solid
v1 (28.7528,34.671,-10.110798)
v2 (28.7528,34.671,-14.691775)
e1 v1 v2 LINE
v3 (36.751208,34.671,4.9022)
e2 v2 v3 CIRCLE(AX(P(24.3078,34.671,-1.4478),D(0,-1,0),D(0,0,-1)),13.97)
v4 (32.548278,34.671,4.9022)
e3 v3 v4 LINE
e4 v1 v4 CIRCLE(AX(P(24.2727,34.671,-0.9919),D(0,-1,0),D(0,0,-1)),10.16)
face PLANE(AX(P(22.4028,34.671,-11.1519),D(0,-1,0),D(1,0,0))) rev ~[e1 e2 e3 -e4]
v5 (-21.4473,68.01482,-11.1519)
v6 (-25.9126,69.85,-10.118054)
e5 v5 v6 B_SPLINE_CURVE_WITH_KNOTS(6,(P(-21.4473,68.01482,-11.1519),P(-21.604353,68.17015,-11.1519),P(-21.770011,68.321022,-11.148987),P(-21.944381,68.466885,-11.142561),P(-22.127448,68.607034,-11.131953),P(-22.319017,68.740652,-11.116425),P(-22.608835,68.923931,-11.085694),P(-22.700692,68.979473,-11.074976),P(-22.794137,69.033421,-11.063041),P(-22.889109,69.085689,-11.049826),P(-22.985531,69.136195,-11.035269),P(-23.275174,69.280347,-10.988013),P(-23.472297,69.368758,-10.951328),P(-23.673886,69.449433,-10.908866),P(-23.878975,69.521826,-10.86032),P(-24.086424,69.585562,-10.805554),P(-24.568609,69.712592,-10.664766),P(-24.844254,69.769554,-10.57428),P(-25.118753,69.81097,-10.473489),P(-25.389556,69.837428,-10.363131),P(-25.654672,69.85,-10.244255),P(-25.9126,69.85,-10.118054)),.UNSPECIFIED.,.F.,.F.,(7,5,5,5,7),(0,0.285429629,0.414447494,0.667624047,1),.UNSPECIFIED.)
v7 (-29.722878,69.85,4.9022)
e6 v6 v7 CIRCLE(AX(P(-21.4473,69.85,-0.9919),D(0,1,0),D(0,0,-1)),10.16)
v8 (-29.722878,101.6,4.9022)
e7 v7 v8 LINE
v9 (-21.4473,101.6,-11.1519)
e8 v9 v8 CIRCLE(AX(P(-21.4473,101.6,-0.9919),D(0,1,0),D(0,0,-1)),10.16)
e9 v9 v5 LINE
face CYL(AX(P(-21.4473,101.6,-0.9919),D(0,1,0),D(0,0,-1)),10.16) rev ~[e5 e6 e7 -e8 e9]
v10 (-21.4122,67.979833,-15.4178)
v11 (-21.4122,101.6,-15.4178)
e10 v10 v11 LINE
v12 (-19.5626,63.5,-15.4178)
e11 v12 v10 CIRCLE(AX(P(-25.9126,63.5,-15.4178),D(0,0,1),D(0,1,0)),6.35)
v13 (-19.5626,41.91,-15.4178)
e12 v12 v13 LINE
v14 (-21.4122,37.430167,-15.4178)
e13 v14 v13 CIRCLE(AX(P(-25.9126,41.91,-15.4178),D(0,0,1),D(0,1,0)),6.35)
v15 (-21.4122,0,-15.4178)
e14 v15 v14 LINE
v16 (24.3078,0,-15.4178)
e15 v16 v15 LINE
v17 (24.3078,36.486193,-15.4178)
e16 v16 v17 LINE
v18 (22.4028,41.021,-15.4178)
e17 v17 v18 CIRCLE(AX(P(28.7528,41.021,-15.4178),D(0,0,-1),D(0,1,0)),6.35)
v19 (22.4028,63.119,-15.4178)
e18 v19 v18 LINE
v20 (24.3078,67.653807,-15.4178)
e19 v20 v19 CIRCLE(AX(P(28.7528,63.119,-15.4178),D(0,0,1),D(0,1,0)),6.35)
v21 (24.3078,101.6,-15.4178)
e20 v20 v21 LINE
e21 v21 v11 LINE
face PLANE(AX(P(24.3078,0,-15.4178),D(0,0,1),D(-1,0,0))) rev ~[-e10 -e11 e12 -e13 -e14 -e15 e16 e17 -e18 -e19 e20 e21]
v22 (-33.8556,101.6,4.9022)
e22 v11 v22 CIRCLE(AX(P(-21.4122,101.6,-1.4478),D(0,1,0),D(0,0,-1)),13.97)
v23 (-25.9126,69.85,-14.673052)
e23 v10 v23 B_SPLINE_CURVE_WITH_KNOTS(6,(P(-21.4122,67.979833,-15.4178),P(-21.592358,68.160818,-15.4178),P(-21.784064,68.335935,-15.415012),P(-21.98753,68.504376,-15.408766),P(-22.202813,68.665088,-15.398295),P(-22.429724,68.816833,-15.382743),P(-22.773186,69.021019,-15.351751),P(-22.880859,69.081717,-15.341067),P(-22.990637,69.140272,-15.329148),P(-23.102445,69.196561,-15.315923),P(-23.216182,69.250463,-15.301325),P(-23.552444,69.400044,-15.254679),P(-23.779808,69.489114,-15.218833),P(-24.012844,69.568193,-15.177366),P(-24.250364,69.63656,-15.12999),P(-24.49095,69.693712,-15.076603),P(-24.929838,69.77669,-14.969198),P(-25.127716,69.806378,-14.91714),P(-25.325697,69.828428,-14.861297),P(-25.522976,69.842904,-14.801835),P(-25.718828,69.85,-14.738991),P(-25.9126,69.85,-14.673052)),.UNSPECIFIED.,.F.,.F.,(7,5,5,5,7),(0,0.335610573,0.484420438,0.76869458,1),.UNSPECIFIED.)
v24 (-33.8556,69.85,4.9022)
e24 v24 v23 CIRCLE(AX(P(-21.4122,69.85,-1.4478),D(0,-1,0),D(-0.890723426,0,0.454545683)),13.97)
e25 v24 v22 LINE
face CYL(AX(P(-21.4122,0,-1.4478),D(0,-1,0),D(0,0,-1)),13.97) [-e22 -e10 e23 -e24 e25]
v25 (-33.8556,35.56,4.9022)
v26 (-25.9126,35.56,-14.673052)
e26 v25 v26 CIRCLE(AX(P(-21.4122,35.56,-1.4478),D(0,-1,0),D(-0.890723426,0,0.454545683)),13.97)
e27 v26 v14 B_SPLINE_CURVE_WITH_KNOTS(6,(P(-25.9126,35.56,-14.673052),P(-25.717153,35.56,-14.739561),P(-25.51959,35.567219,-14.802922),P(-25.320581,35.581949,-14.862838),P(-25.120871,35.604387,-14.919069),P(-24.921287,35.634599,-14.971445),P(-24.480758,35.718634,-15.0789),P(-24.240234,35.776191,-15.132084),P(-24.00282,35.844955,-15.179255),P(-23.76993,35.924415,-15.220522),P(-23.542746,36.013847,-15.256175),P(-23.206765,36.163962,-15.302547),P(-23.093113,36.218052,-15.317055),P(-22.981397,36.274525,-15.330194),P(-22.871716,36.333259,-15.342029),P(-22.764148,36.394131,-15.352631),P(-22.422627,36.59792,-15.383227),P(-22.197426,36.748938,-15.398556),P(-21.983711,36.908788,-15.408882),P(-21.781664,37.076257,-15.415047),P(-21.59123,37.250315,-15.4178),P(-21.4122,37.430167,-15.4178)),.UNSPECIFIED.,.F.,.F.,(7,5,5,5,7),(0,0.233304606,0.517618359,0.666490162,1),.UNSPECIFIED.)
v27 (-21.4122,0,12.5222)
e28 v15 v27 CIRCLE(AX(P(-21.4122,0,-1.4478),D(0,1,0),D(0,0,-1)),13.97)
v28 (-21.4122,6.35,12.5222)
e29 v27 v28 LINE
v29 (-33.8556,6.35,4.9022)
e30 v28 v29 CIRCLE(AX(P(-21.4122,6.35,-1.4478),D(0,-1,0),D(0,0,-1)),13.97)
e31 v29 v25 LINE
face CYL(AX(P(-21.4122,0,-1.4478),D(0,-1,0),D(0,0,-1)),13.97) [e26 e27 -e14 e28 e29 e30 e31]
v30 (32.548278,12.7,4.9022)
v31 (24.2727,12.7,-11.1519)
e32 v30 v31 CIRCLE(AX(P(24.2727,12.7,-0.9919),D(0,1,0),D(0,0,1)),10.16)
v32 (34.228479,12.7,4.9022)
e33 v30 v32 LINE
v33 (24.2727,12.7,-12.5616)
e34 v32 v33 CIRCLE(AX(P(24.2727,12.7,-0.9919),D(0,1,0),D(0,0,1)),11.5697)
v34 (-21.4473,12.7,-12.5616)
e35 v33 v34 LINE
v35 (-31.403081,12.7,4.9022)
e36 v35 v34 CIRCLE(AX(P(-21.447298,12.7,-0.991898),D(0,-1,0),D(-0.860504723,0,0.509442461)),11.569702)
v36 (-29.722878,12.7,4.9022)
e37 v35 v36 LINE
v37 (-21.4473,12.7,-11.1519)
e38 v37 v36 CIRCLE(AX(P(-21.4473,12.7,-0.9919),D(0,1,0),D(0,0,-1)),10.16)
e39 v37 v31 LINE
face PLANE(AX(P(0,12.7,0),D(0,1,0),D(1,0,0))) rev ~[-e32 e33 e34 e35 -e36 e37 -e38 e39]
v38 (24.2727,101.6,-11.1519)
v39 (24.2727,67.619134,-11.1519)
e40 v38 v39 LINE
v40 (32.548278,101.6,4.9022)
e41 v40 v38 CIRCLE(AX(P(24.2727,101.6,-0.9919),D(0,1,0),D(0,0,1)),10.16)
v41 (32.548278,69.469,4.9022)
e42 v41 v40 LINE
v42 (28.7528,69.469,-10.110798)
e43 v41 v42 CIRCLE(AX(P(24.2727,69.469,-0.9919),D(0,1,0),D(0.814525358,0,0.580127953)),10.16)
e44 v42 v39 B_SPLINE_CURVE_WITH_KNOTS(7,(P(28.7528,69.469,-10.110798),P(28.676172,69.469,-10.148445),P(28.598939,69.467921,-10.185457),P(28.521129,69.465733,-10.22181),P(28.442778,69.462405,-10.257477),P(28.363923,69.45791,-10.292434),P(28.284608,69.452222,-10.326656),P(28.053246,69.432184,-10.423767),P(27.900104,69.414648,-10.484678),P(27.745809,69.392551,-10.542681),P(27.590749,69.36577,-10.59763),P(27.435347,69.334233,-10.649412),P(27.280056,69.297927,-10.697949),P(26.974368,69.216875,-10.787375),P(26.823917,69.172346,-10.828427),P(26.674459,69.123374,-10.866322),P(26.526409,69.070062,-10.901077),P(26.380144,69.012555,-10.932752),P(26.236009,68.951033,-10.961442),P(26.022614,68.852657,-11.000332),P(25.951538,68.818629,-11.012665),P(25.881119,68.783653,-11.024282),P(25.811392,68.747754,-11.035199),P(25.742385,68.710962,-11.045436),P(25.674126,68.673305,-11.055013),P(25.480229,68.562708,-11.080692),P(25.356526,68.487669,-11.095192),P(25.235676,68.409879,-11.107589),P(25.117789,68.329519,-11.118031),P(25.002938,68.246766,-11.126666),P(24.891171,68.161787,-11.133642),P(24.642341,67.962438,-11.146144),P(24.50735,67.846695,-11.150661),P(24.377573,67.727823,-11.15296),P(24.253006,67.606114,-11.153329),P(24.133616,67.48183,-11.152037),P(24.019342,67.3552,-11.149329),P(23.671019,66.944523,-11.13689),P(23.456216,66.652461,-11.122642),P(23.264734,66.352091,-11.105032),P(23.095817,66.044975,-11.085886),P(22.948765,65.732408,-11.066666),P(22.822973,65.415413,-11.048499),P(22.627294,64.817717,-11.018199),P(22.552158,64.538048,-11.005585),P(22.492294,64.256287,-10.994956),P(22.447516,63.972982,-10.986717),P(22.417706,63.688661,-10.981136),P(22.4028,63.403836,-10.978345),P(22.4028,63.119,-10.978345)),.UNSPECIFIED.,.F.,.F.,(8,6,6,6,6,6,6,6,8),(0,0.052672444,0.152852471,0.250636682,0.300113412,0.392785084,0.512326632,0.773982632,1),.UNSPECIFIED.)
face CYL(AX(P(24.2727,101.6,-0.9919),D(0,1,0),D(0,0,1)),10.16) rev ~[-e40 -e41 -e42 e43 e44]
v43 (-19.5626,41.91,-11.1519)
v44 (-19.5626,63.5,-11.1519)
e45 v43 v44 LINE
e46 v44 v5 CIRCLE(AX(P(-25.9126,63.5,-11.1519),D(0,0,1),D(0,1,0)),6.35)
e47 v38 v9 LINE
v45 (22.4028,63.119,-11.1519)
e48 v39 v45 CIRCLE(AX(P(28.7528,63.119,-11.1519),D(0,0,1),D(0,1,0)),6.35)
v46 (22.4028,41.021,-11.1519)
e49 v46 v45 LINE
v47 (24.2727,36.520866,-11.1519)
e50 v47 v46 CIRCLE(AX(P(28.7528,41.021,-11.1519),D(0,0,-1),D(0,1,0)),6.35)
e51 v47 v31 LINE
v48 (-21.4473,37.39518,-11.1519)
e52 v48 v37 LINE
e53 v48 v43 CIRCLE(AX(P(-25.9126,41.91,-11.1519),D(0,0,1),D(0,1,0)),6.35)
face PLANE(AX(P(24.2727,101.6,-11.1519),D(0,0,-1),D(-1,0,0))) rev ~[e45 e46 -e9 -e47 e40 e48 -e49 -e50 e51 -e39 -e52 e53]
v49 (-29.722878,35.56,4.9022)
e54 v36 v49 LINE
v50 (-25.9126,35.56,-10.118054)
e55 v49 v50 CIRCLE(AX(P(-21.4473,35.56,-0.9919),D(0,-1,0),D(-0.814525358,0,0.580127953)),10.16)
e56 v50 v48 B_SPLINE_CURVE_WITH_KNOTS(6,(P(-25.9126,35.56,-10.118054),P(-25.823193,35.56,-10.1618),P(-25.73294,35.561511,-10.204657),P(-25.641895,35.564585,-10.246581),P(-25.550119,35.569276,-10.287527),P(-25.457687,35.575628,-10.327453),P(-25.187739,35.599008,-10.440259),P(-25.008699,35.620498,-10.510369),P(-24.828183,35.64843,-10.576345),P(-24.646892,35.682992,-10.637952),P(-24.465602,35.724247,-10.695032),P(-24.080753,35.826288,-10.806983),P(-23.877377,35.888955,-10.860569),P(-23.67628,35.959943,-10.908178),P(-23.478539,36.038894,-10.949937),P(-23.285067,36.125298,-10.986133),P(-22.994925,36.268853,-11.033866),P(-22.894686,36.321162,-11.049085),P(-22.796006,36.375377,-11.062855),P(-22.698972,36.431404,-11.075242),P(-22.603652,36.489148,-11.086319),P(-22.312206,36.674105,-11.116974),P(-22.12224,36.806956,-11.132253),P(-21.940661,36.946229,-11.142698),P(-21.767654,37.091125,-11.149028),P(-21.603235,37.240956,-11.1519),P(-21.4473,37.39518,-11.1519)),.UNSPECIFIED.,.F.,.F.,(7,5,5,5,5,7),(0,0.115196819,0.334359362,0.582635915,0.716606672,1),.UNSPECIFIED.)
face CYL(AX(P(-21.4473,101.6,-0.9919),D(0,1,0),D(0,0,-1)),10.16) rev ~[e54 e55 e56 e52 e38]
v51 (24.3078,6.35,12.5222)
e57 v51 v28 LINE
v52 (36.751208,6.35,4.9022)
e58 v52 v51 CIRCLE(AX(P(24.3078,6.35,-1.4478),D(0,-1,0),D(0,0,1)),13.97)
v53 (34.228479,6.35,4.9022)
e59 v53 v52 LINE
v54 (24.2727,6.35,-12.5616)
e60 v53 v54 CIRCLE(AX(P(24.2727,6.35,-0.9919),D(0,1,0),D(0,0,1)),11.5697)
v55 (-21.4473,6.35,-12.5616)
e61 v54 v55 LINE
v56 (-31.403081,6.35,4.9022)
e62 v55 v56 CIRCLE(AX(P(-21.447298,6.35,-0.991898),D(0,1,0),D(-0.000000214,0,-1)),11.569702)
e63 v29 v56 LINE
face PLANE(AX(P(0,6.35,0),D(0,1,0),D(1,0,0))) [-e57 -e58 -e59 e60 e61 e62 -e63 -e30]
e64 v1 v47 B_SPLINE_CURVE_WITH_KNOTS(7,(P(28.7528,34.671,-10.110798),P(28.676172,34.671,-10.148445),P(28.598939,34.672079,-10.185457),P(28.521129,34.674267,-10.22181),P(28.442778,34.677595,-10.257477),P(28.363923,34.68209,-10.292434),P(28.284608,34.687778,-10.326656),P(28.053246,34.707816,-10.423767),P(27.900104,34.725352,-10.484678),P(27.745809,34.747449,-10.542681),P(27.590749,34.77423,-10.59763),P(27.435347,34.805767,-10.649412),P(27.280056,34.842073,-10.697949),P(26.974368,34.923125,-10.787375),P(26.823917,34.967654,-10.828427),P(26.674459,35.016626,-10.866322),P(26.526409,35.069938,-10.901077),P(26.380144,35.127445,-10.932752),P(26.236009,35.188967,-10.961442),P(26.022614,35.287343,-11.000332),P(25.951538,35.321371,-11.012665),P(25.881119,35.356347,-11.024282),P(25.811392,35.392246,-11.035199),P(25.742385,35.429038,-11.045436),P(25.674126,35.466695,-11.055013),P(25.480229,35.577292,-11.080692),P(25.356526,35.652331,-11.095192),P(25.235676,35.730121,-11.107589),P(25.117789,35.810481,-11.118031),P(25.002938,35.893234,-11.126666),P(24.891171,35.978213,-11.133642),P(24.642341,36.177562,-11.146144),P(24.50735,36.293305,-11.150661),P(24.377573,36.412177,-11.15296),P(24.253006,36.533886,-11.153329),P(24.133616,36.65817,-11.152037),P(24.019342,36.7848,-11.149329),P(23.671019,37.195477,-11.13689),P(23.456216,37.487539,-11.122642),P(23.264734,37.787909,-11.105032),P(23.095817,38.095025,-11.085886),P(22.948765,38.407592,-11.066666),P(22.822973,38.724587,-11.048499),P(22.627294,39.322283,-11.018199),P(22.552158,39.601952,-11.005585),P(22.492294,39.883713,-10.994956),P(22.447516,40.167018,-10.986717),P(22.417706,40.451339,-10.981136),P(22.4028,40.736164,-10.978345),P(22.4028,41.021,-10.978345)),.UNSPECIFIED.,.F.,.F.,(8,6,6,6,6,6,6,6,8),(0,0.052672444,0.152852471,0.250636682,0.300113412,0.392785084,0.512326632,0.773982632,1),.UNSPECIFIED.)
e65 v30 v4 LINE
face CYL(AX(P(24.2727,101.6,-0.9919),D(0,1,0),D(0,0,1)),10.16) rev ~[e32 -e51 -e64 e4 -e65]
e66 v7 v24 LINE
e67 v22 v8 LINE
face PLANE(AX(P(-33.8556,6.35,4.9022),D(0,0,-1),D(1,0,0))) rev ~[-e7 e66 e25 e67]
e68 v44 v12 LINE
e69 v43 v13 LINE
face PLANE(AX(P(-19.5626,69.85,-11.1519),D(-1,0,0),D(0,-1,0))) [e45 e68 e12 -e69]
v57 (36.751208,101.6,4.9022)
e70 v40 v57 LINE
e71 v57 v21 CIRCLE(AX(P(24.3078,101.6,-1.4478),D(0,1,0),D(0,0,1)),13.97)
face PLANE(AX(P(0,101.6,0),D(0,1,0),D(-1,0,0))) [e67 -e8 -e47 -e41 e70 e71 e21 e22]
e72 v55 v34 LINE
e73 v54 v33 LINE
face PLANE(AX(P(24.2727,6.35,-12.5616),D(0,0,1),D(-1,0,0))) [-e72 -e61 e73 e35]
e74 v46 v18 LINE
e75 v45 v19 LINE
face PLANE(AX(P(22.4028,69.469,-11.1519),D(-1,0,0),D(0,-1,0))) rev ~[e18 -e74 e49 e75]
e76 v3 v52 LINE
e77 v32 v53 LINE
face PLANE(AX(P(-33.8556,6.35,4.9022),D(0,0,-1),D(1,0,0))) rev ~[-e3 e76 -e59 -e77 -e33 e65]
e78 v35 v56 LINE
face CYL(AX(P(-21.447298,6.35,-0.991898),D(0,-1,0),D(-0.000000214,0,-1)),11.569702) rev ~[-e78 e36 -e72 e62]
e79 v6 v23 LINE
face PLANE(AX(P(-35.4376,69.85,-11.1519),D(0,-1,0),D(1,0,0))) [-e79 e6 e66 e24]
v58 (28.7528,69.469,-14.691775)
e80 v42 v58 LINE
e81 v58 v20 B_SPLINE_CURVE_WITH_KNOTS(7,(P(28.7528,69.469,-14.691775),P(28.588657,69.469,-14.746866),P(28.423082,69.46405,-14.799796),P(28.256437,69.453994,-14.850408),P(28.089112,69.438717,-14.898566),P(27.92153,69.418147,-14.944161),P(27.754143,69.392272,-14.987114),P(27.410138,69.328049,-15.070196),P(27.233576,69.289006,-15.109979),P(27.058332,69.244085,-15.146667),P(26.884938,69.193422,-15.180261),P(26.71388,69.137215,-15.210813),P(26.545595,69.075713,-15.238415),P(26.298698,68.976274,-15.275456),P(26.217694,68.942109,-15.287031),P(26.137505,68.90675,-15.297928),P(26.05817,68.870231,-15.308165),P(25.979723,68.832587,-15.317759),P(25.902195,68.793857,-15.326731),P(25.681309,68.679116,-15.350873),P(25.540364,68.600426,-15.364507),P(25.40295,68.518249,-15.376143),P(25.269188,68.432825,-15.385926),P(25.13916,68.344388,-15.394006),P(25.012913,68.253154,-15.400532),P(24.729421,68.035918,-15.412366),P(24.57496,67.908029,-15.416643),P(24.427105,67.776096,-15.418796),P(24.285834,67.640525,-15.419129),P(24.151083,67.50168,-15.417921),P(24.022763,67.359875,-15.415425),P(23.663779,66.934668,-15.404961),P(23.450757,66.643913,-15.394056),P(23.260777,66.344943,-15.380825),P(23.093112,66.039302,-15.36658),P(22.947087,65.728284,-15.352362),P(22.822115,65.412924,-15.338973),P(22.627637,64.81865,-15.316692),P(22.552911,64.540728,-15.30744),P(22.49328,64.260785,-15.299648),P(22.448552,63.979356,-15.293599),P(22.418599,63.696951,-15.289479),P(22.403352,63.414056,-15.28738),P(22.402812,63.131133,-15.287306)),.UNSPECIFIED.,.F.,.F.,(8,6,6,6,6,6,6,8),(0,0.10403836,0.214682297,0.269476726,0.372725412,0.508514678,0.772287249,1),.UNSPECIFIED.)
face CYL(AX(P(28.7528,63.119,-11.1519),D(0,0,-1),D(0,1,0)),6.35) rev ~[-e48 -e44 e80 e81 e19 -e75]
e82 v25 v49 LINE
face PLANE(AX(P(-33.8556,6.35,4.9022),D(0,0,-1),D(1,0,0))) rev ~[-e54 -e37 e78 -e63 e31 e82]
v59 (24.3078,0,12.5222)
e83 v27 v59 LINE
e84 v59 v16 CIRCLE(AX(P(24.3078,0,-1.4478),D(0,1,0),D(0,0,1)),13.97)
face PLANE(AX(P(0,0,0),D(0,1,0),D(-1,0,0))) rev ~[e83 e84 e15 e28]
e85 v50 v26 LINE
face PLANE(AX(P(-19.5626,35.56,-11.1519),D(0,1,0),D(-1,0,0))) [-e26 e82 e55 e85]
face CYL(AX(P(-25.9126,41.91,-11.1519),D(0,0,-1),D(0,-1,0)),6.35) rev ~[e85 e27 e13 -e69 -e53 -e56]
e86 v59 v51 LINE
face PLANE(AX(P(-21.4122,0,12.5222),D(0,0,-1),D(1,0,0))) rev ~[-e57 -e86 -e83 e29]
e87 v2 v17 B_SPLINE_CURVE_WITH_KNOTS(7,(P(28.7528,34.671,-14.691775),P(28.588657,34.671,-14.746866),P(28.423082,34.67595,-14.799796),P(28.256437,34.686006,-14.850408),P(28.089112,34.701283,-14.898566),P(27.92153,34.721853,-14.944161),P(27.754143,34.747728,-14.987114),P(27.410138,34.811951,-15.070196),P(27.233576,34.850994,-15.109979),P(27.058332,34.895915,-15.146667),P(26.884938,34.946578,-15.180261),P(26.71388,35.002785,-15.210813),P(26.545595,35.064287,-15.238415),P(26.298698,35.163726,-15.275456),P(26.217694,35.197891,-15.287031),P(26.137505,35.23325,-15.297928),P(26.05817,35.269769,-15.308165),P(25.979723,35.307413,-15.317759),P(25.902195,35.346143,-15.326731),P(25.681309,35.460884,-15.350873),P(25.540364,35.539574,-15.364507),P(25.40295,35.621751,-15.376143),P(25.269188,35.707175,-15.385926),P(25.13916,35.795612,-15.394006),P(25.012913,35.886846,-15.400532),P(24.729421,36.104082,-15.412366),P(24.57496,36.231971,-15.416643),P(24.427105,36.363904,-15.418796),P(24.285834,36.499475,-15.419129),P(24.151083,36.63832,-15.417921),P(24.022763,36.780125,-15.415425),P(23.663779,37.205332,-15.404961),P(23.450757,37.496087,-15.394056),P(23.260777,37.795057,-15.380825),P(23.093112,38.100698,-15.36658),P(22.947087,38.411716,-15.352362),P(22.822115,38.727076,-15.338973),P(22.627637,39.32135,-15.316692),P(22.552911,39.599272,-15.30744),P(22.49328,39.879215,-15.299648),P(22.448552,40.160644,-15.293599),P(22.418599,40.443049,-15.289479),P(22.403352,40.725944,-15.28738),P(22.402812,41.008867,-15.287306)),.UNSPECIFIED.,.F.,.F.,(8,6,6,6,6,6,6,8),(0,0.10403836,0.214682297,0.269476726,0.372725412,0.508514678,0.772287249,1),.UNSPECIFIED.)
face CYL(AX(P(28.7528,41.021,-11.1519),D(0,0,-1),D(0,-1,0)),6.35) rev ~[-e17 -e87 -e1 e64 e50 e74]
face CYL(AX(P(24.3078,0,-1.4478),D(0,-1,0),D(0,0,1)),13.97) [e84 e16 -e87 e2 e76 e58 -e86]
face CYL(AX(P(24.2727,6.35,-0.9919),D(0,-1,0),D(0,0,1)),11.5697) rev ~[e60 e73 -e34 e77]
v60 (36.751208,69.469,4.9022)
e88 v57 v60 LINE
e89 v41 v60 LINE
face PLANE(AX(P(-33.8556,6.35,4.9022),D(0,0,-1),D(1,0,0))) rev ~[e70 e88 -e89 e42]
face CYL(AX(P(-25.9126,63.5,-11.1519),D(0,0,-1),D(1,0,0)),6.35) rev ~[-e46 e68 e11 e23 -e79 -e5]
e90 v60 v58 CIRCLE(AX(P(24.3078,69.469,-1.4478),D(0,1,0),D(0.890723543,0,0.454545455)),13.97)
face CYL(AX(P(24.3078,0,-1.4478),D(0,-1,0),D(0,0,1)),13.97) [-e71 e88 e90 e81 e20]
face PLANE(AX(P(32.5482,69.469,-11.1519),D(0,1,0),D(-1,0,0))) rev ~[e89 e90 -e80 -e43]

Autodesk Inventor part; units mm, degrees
ref_plane "YZ Plane" through (0, 0, 0) normal (1, 0, 0) x (0, 1, 0)
sketch "Sketch1" plane through (0, 0, 0) normal (0, 1, 0) x (-1, 0, 0)
  line L0 (-24.3078, -15.4178) -> (21.4122, -15.4178)
  line L1 (21.4122, 12.5222) -> (-24.3078, 12.5222)
  arc A0 (21.4122, -15.4178) -> (21.4122, 12.5222) centre (21.4122, -1.4478) ccw
  arc A1 (-24.3078, 12.5222) -> (-24.3078, -15.4178) centre (-24.3078, -1.4478) ccw
  point P0 (0, 0)
  dimension "d2" = 27.94
  dimension "d3" = 45.72
extrude "Extrusion1" add sketch "Sketch1" along normal blind 101.6
sketch "Sketch2" plane through (0, 101.6, 0) normal (0, 1, 0) x (1, 0, 0)
  line L0 (24.2727, 11.1519) -> (-21.4473, 11.1519)
  line L1 (-21.4473, -9.1681) -> (24.2727, -9.1681)
  arc A0 (-21.4473, 11.1519) -> (-21.4473, -9.1681) centre (-21.4473, 0.9919) ccw
  arc A1 (24.2727, -9.1681) -> (24.2727, 11.1519) centre (24.2727, 0.9919) ccw
  arc A2 (-21.4122, 15.4178) -> (-21.4122, -12.5222) centre (-21.4122, 1.4478) ccw projected
  point P0 (0, 0)
  dimension "d7" = 20.32
  dimension "d8" = 45.72
extrude "Extrusion2" cut sketch "Sketch2" against normal blind 95.25
sketch "Sketch3" plane through (0, 6.35, 0) normal (0, 1, 0) x (1, 0, 0)
  arc A0 (-21.4122, 15.4178) -> (-21.4122, -12.5222) centre (-21.4122, 1.4478) ccw projected
  line L0 (-33.8556, -4.9022) -> (40.6958, -4.9022)
  line L1 (40.6958, -4.9022) -> (40.6958, -12.5222)
  line L2 (40.6958, -12.5222) -> (-33.8556, -12.5222)
  line L3 (-33.8556, -12.5222) -> (-33.8556, -4.9022)
  line L4 (-21.4122, -12.5222) -> (24.3078, -12.5222) projected
  point P0 (0, 0)
  dimension "d13" = 7.62
  dimension "d14" = 0
extrude "Extrusion3" cut sketch "Sketch3" along normal blind 95.25
fillet "Fillet1" [suppressed]
ref_plane "Work Plane1" through (-21.4473, 101.6, -11.1519) normal (-1, 0, 0) x (0, -1, 0)
ref_plane "Work Plane2" through (24.2727, 101.6, -11.1519) normal (-1, 0, 0) x (0, -1, 0)
sketch "Sketch6" plane through (24.2727, 101.6, -11.1519) normal (-1, 0, 0) x (0, -1, 0)
  line L0 (66.929, 0.4433) -> (32.131, 0.4433)
  line L1 (32.131, 0.4433) -> (32.131, 26.3545)
  line L2 (32.131, 26.3545) -> (66.929, 26.3545)
  line L3 (66.929, 26.3545) -> (66.929, 0.4433)
  line L4 (95.25, 16.0541) -> (95.25, 23.6741) projected
  point P0 (101.6, 11.1519)
  point P1 (95.25, 16.0541)
  dimension "d30" = 34.798
  dimension "d31" = 28.321
extrude "Extrusion6" cut sketch "Sketch6" against normal up to next
sketch "Sketch7" plane through (-21.4473, 101.6, -11.1519) normal (-1, 0, 0) x (0, -1, 0)
  line L0 (31.75, 1.1631) -> (66.04, 1.1631)
  line L1 (66.04, 1.1631) -> (66.04, 21.3162)
  line L2 (66.04, 21.3162) -> (31.75, 21.3162)
  line L3 (31.75, 21.3162) -> (31.75, 1.1631)
  line L4 (95.25, 16.0541) -> (95.25, 23.6741) projected
  point P0 (101.6, 11.1519)
  dimension "d35" = 34.29
  dimension "d36" = 29.21
extrude "Extrusion7" cut sketch "Sketch7" along normal blind 25.4
sketch "Sketch10" plane through (-21.4473, 101.6, -11.1519) normal (0, 0, 1) x (1, 0, 0)
  line L0 (-13.9903, -31.75) -> (1.8847, -31.75)
  line L1 (1.8847, -31.75) -> (1.8847, -66.04)
  line L2 (1.8847, -66.04) -> (-13.9903, -66.04)
  line L3 (-13.9903, -66.04) -> (-13.9903, -31.75)
  line L4 (59.7251, -101.6) -> (59.7251, 0) projected
  line L5 (59.7251, -32.131) -> (43.8501, -32.131)
  line L6 (43.8501, -32.131) -> (43.8501, -66.929)
  line L7 (43.8501, -66.929) -> (59.7251, -66.929)
  line L8 (59.7251, -66.929) -> (59.7251, -32.131)
  line L9 (53.9955, -32.131) -> (58.1985, -32.131) projected
  point P0 (21.4473, -101.6)
  point P1 (55.1473, -32.131)
  dimension "d58" = 15.875
  dimension "d59" = 34.29
  dimension "d60" = 15.875
  dimension "d61" = 34.798
  dimension "d62" = 0
extrude "Extrusion10" cut sketch "Sketch10" against normal through all both and the other way through all
fillet "Fillet6" radius 6.35 4 edges at (22.4028, 69.469, -13.2849) (22.4028, 34.671, -13.2849) (-19.5625, 69.85, -13.2849) (-19.5625, 35.56, -13.2849)
sketch "Sketch11" plane through (0, 6.35, 0) normal (0, 1, 0) x (1, 0, 0)
  arc A0 (32.5483, -4.9022) -> (24.2727, 11.1519) centre (24.2727, 0.9919) ccw projected
  arc A1 (24.2727, -10.5778) -> (24.2727, 12.5616) centre (24.2727, 0.9919) ccw
  arc A2 (-21.4473, 11.1519) -> (-29.7228, -4.9022) centre (-21.4473, 0.9919) ccw projected
  arc A3 (-21.4473, 12.5616) -> (-20.3359, -10.5243) centre (-21.4473, 0.9919) ccw
  line L0 (24.2727, 12.5616) -> (-24.2727, 12.5616)
  line L1 (-20.4393, -10.5778) -> (24.2727, 12.5616) construction
  line L2 (20.4393, -10.5778) -> (-24.2727, 12.5616) construction
  line L3 (24.2727, -10.5778) -> (-21.4473, -10.5778)
  line L4 (-24.2727, 12.5616) -> (-24.2727, 10.7512)
  line L5 (24.2727, 0.9919) -> (24.2727, 12.5616)
  point P0 (0, 0)
  point P1 (33.1455, -3.9578)
  point P2 (-30.32, -3.9578)
  dimension "d66" = 23.1394
  dimension "d67" = 23.1394
extrude "Extrusion11" cut sketch "Sketch11" along normal blind 6.35 contours L3 A3 L0 A1
properties part number "Proto-Valve Holder"
